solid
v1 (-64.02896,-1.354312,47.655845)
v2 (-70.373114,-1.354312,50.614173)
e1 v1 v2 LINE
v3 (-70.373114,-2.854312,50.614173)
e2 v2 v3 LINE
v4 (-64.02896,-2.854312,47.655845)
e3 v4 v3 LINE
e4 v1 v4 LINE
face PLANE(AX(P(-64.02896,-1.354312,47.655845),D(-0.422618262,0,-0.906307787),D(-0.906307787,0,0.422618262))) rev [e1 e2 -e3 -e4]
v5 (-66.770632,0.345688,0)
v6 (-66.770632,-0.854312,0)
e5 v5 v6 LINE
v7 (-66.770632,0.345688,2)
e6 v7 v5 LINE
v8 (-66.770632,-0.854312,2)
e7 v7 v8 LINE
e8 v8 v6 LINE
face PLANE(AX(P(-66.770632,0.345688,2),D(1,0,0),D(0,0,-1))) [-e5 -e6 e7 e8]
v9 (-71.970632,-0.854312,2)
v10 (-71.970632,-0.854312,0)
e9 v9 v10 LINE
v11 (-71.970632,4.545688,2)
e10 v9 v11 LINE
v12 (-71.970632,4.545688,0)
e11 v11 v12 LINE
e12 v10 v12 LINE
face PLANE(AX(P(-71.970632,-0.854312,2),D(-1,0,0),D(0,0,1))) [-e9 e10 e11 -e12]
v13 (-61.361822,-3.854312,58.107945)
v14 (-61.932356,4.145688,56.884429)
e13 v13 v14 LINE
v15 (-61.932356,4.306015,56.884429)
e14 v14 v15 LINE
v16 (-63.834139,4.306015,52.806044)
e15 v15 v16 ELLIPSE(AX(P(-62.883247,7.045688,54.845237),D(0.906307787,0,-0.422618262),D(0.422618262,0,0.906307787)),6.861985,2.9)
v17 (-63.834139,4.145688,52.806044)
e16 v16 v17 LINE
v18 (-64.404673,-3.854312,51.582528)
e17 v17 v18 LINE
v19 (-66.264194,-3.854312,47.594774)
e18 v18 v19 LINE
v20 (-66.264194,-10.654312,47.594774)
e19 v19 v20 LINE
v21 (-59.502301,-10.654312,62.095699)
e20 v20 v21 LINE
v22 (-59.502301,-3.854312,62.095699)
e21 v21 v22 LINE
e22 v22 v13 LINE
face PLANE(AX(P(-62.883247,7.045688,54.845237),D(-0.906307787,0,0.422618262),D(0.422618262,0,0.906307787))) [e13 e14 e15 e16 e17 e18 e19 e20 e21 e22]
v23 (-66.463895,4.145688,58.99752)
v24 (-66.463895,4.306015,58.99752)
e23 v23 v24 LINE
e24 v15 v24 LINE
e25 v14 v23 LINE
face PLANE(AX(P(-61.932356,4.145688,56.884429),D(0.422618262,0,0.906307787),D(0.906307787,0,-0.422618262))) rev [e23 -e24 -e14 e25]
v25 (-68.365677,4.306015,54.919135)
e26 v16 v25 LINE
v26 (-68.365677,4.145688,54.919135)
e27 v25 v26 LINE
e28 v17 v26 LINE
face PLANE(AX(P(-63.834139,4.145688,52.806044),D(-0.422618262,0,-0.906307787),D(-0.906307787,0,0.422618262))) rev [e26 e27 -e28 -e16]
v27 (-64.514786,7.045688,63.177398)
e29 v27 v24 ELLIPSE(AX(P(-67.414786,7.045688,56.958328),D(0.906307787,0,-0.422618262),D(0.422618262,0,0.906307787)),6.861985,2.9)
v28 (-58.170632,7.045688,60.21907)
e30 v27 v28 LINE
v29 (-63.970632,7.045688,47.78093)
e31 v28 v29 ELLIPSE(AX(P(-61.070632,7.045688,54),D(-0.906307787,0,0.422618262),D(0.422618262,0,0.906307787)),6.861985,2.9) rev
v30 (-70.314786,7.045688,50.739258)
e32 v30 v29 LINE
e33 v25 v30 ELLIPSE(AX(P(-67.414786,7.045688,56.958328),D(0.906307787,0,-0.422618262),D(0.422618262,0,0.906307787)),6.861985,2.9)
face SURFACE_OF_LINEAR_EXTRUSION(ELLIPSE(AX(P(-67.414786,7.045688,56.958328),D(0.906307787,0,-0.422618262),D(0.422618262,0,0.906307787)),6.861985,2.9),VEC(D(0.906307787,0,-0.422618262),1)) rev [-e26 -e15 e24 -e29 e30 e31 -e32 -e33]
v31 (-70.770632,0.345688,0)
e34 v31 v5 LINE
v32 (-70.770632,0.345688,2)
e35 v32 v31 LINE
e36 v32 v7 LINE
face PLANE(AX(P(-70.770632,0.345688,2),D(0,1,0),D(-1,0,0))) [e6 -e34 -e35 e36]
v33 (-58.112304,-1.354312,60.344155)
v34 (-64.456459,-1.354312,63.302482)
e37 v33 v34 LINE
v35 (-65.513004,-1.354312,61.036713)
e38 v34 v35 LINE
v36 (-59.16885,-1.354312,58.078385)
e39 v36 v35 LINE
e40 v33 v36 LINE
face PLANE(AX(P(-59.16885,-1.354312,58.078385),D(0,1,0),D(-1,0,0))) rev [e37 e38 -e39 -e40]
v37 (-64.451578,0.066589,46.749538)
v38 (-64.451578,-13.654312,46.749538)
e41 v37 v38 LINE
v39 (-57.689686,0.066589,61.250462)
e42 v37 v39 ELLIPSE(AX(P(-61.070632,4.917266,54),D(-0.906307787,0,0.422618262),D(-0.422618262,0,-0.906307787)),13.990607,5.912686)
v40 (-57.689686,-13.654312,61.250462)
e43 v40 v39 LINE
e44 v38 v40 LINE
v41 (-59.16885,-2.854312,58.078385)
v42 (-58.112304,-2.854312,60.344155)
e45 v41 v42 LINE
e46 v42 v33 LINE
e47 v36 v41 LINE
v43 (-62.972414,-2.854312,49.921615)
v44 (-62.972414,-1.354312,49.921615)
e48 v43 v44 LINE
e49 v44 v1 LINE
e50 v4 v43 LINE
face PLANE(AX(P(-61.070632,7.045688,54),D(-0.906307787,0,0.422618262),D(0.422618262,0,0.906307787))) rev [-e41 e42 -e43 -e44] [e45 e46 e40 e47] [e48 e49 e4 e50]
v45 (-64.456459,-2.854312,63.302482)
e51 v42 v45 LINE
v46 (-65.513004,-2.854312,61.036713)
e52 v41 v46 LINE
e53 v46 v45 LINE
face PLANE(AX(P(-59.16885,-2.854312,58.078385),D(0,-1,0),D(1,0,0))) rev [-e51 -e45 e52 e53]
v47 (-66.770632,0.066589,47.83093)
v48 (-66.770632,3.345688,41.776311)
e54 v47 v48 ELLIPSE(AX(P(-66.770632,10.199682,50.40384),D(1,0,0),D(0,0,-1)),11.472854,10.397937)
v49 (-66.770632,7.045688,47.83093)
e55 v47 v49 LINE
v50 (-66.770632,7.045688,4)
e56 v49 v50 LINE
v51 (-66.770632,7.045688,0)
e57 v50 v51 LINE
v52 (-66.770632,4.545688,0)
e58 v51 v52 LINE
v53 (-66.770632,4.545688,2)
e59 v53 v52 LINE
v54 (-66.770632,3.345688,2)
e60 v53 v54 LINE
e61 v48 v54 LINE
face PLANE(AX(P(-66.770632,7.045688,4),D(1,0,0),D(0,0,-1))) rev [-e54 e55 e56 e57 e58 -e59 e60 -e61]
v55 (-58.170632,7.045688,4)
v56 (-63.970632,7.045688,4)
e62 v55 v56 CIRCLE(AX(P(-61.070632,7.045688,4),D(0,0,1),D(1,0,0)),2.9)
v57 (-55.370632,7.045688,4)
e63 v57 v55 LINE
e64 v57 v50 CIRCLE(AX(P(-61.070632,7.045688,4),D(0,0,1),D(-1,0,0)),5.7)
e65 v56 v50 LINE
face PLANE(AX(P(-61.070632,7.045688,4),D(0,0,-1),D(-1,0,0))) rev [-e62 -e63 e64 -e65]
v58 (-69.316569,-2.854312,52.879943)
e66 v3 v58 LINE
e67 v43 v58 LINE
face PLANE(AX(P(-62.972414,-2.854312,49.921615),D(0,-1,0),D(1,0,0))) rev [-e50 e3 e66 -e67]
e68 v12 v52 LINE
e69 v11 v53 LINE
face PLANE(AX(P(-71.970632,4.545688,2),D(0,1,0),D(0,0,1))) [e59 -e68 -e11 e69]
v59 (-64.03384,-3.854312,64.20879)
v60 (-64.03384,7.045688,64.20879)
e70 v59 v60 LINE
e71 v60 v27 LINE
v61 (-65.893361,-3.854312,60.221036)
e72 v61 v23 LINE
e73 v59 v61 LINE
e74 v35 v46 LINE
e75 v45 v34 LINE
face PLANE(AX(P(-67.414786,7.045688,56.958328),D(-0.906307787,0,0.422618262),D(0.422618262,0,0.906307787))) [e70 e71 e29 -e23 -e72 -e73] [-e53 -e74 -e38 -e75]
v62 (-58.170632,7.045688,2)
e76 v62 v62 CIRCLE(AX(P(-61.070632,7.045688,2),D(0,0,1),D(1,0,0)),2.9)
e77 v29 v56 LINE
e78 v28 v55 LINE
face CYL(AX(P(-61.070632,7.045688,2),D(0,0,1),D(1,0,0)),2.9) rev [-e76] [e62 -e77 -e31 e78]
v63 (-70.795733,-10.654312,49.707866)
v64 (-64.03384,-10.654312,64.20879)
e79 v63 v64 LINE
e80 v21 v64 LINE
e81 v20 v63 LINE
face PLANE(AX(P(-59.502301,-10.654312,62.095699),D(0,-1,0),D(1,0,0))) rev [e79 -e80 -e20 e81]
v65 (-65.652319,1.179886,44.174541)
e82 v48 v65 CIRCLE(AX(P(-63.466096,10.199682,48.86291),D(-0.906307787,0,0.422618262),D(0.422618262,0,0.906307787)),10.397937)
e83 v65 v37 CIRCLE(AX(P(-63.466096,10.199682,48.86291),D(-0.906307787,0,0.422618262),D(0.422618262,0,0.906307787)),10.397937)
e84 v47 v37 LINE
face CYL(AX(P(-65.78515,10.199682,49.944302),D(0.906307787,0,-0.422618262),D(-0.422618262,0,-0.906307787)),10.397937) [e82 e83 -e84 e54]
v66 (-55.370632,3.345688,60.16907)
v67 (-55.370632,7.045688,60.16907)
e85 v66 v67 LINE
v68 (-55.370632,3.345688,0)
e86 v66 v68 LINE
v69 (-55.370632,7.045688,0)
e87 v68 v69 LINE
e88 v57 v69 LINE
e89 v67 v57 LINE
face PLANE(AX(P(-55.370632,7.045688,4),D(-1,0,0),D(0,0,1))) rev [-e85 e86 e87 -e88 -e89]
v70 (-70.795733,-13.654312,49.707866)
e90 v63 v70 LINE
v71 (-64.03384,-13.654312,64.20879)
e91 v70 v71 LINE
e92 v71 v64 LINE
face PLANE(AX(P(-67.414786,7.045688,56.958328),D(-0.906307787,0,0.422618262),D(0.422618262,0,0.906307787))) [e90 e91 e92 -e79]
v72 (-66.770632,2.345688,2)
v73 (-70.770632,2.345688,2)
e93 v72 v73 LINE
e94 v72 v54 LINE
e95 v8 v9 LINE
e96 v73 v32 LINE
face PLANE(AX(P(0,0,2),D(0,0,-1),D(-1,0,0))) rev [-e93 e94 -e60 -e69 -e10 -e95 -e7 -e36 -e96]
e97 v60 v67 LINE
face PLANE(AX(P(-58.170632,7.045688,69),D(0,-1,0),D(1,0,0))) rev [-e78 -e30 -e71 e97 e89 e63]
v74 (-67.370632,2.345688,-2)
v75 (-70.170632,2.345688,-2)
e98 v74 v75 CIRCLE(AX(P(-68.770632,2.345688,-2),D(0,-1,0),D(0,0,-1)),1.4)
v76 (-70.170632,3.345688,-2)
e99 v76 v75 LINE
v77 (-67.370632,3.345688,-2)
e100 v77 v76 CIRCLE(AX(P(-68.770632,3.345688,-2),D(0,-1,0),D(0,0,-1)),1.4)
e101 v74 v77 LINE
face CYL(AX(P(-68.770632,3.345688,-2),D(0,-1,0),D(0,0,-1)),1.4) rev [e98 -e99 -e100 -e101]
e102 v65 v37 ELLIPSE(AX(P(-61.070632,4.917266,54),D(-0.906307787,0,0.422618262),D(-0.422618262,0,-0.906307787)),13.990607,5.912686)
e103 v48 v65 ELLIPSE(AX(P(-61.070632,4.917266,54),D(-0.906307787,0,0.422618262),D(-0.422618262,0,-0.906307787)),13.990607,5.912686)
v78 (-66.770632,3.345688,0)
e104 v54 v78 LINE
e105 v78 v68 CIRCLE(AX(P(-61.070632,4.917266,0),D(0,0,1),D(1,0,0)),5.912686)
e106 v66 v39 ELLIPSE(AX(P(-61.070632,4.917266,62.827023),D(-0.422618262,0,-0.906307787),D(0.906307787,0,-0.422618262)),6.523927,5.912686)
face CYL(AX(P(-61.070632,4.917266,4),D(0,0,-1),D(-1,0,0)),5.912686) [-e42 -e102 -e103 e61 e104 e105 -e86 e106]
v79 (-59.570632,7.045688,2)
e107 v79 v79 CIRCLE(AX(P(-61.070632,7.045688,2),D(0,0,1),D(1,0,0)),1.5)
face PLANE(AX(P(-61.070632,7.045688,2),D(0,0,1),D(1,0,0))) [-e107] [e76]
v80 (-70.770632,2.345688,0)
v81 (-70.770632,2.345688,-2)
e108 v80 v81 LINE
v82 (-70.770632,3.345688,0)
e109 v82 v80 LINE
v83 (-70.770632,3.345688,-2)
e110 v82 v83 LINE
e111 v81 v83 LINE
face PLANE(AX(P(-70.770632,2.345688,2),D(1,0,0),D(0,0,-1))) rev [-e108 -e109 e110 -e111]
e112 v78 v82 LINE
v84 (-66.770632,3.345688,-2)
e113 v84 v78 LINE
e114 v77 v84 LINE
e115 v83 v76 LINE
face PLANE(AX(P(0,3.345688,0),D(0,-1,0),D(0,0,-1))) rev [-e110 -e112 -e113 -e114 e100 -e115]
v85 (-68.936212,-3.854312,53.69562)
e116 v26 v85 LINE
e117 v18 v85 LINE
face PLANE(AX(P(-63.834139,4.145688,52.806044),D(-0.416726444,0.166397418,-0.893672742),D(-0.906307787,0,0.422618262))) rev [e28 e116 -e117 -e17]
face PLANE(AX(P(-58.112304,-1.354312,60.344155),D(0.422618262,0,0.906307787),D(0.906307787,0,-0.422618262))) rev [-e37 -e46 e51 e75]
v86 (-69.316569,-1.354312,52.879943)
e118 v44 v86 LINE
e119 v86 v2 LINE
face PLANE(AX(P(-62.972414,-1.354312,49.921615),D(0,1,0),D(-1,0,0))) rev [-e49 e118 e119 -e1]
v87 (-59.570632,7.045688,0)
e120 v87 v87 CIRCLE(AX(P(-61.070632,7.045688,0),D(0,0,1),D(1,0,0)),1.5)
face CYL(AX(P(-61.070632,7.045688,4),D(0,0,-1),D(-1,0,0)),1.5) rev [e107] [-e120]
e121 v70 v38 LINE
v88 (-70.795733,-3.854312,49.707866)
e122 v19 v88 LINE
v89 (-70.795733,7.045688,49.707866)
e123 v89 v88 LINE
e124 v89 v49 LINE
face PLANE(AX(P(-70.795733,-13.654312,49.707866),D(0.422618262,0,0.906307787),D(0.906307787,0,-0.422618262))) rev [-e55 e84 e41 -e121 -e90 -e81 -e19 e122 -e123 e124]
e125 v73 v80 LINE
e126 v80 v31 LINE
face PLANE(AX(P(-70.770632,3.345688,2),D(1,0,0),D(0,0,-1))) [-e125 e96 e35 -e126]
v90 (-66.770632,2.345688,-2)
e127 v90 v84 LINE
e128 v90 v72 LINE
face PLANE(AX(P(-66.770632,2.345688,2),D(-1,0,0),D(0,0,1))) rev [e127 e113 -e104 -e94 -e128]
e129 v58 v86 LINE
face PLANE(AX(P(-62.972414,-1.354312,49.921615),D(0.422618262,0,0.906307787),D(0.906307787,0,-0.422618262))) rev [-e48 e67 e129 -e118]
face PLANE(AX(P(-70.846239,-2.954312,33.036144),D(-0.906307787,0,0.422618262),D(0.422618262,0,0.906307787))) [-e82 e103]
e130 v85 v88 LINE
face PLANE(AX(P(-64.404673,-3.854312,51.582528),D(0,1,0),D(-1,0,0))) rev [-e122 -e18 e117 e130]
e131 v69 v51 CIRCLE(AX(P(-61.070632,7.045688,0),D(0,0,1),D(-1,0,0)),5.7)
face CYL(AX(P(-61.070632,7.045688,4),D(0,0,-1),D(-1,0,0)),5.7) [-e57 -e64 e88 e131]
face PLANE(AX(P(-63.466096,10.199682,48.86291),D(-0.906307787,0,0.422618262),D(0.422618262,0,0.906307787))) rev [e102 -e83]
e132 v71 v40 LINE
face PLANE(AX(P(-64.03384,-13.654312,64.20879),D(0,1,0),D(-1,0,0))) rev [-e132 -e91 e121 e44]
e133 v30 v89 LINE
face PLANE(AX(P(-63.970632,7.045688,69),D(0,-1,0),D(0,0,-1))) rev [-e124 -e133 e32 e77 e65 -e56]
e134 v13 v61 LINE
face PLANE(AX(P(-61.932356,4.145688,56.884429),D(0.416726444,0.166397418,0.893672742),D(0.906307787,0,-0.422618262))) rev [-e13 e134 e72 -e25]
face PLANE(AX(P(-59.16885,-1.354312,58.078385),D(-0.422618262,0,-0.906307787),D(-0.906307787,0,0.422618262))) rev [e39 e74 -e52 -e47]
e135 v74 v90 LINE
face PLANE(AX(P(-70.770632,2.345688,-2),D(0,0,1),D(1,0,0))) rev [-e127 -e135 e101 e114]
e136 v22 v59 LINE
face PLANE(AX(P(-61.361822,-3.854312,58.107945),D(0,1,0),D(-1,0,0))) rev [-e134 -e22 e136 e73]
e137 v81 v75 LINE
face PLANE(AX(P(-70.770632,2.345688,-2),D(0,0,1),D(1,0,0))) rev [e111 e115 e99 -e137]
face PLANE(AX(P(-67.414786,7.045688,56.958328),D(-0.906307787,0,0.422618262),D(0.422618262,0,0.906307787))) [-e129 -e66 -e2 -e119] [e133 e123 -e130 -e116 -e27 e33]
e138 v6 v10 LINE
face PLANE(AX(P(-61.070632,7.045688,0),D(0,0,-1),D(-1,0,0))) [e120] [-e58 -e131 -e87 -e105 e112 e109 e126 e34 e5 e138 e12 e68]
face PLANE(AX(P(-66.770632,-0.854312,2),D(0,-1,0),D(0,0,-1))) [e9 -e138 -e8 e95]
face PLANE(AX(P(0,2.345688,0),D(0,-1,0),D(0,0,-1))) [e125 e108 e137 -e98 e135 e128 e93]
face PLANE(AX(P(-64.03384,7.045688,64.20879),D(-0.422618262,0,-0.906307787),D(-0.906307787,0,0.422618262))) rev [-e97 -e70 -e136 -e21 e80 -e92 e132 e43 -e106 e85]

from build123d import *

# Parameters (mm, degrees)
CROQUIS1_R                = 1.5
SALIENTE_EXTRUIR1_DEPTH   = 4
CROQUIS2_R                = 2.9
CORTAR_EXTRUIR1_DEPTH     = 2
SALIENTE_EXTRUIR2_DEPTH   = 65
CORTAR_EXTRUIR2_OUTLINE_W = 7.281077338
CORTAR_EXTRUIR2_OUTLINE_H = 8.780929931
CORTAR_EXTRUIR2_DEPTH     = 8.6
CORTAR_EXTRUIR2_TAPER     = -65
CROQUIS5_W                = 41.142355125
CROQUIS5_H                = 35.377069929
CORTAR_EXTRUIR3_DEPTH     = 10
SALIENTE_EXTRUIR3_DEPTH   = 7
CORTAR_EXTRUIR4_DEPTH     = 5
CORTAR_EXTRUIR5_START     = -7
CROQUIS8_W                = 2.5
CROQUIS8_H                = 1.5
CORTAR_EXTRUIR5_DEPTH     = 7
CORTAR_EXTRUIR6_DEPTH     = 10
SALIENTE_EXTRUIR4_DEPTH   = 3.7
SALIENTE_EXTRUIR5_DEPTH   = 2.558793
CORTAR_EXTRUIR7_DEPTH     = 10
SALIENTE_EXTRUIR6_DEPTH   = 2
CROQUIS15_W               = 4
CROQUIS15_H               = 4
SALIENTE_EXTRUIR7_DEPTH   = 1
CROQUIS16_R               = 1.4
CORTAR_EXTRUIR8_DEPTH     = 1


# Read off the part's stored shape, not the designer's step: Cortar-Extruir2
with BuildPart() as part:
    # Croquis1 → Saliente-Extruir1 (new body)
    with BuildSketch(Plane.XY):
        with BuildLine():
            Line((-55.370631899, 7.045687646), (-55.370631899, 3.345687646))
            ThreePointArc((-55.370631899, 3.345687646), (-61.070631899, -0.995420457), (-66.770631899, 3.345687646))
            Line((-66.770631899, 3.345687646), (-66.770631899, 7.045687646))
            ThreePointArc((-66.770631899, 7.045687646), (-61.070631899, 12.745687646), (-55.370631899, 7.045687646))
        make_face()
        with Locations((-61.070631899, 7.045687646)):
            Circle(CROQUIS1_R, mode=Mode.SUBTRACT)
    extrude(amount=SALIENTE_EXTRUIR1_DEPTH)

    # Croquis2 → Cortar-Extruir1 (cut)
    with BuildSketch(Plane.XY.offset(4)):
        with Locations((-61.070631899, 7.045687646)):
            Circle(CROQUIS2_R)
    extrude(amount=-CORTAR_EXTRUIR1_DEPTH, mode=Mode.SUBTRACT)

    # Croquis3 → Saliente-Extruir2 (add)
    with BuildSketch(Plane.XY.offset(4)):
        with BuildLine():
            Line((-63.970631899, 7.045687646), (-66.770631899, 7.045687646))
            Line((-66.770631899, 7.045687646), (-66.770631899, 3.345687646))
            ThreePointArc((-66.770631899, 3.345687646), (-61.070631899, -0.995420457), (-55.370631899, 3.345687646))
            Line((-55.370631899, 3.345687646), (-55.370631899, 7.045687646))
            Line((-55.370631899, 7.045687646), (-58.170631899, 7.045687646))
            ThreePointArc((-58.170631899, 7.045687646), (-61.070631899, 4.145687646), (-63.970631899, 7.045687646))
        make_face()
    extrude(amount=SALIENTE_EXTRUIR2_DEPTH)

    # Cortar-Extruir2 outline → Cortar-Extruir2 (cut)
    with BuildSketch(Plane.YZ.offset(-58.170631899)):
        with Locations((3.405148977, 64.609535034)):
            Rectangle(CORTAR_EXTRUIR2_OUTLINE_W, CORTAR_EXTRUIR2_OUTLINE_H)
    extrude(amount=-CORTAR_EXTRUIR2_DEPTH, taper=CORTAR_EXTRUIR2_TAPER, mode=Mode.SUBTRACT)

    # Croquis5 → Cortar-Extruir3 (cut)
    with BuildSketch(Plane(origin=(-70.846238664, 0, 33.03614364), x_dir=(0.422618261740701, 0, 0.9063077870366493), z_dir=(-0.9063077870366493, 1.4037441023509523e-15, 0.422618261740701))):
        with Locations((23.845262034, -3.548141358)):
            Rectangle(CROQUIS5_W, CROQUIS5_H)
    extrude(amount=CORTAR_EXTRUIR3_DEPTH, mode=Mode.SUBTRACT)

    # Croquis6 → Saliente-Extruir3 (add)
    with BuildSketch(Plane(origin=(-70.846238664, 0, 33.03614364), x_dir=(0.422618261740701, 0, 0.9063077870366493), z_dir=(-0.9063077870366493, 1.4037441023509523e-15, 0.422618261740701))):
        with BuildLine():
            Line((31.131056203, 7.045687646), (29.993040795, 7.045687646))
            add(Edge.make_bspline(
                [(16.269071612, 7.045687646), (16.269071612, 4.145687646), (23.131056203, 4.145687646), (29.993040795, 4.145687646), (29.993040795, 7.045687646)],
                knots=[3.141592654, 3.141592654, 3.141592654, 4.71238898, 4.71238898, 6.283185307, 6.283185307, 6.283185307], degree=2, weights=[1, 0.707106781, 1, 0.707106781, 1]))
            Line((16.269071612, 7.045687646), (15.131056203, 7.045687646))
            Line((15.131056203, 7.045687646), (15.131056203, -13.654312354))
            Line((15.131056203, -13.654312354), (31.131056203, -13.654312354))
            Line((31.131056203, -13.654312354), (31.131056203, 7.045687646))
        make_face()
    extrude(amount=SALIENTE_EXTRUIR3_DEPTH)

    # Croquis7 → Cortar-Extruir4 (cut)
    with BuildSketch(Plane(origin=(-77.190393173, 0, 35.994471473), x_dir=(0.42261826174070094, 0, 0.9063077870366492), z_dir=(-0.9063077870366493, 1.403744102350952e-15, 0.422618261740701))):
        with BuildLine():
            Line((25.381056203, 4.145687646), (26.731056203, -3.854312354))
            Line((26.731056203, -3.854312354), (31.131056203, -3.854312354))
            Line((31.131056203, -3.854312354), (31.131056203, -10.654312354))
            Line((31.131056203, -10.654312354), (15.131056203, -10.654312354))
            Line((15.131056203, -10.654312354), (15.131056203, -3.854312354))
            Line((15.131056203, -3.854312354), (19.531056203, -3.854312354))
            Line((19.531056203, -3.854312354), (20.881056203, 4.145687646))
            Line((20.881056203, 4.145687646), (20.881056203, 4.306015013))
            add(Edge.make_bspline(
                [(20.881056203, 4.306015013), (23.131056203, 3.97597782), (25.381056203, 4.306015013)],
                knots=[4.378316067, 4.378316067, 4.378316067, 5.046461894, 5.046461894, 5.046461894], degree=2, weights=[1, 0.944714701, 1]))
            Line((25.381056203, 4.306015013), (25.381056203, 4.145687646))
        make_face()
    extrude(amount=-CORTAR_EXTRUIR4_DEPTH, mode=Mode.SUBTRACT)

    # Croquis8 → Cortar-Extruir5 (cut)
    with BuildSketch(Plane(origin=(-77.190393173, 0, 35.994471473), x_dir=(0.42261826174070094, 0, 0.9063077870366492), z_dir=(-0.9063077870366493, 1.403744102350952e-15, 0.422618261740701)).offset(CORTAR_EXTRUIR5_START)):
        with Locations((17.381056203, -2.104312354)):
            Rectangle(CROQUIS8_W, CROQUIS8_H)
        with Locations((28.881056203, -2.104312354)):
            Rectangle(CROQUIS8_W, CROQUIS8_H)
    extrude(amount=CORTAR_EXTRUIR5_DEPTH, mode=Mode.SUBTRACT)

    # Croquis9 → Cortar-Extruir6 (cut)
    with BuildSketch(Plane(origin=(0, 7.045687646, 0), x_dir=(1, 0, 0), z_dir=(0, 1, 0))):
        Polygon((-57.689685805, -61.250462296), (-55.370631899, -60.1690697), (-55.370631899, -66.223689447), align=None)
    extrude(amount=-CORTAR_EXTRUIR6_DEPTH, mode=Mode.SUBTRACT)

    # Croquis10 → Saliente-Extruir4 (add)
    with BuildSketch(Plane(origin=(0, 7.045687646, 0), x_dir=(1, 0, 0), z_dir=(0, 1, 0))):
        Polygon((-66.770631899, -41.776310553), (-66.770631899, -47.8309303), (-64.451577993, -46.749537704), align=None)
    extrude(amount=-SALIENTE_EXTRUIR4_DEPTH)

    # Croquis12 → Saliente-Extruir5 (add)
    with BuildSketch(Plane(origin=(-70.846238664, 0, 33.03614364), x_dir=(0.422618261740701, 0, 0.9063077870366493), z_dir=(-0.9063077870366493, 1.4037441023509523e-15, 0.422618261740701))):
        with BuildLine():
            Line((15.131056203, 3.345687646), (15.131056203, 0.066589345))
            ThreePointArc((15.131056203, 0.066589345), (12.129139109, 1.273987016), (9.64370718, 3.345687646))
            Line((9.64370718, 3.345687646), (15.131056203, 3.345687646))
        make_face()
    extrude(amount=SALIENTE_EXTRUIR5_DEPTH)

    # Croquis13 → Cortar-Extruir7 (cut)
    with BuildSketch(Plane(origin=(0, 3.345687646, 0), x_dir=(1, 0, 0), z_dir=(0, 1, 0))):
        Polygon((-66.770631899, -47.8309303), (-66.770631899, -41.776310553), (-69.089685805, -42.857703149), align=None)
    extrude(amount=-CORTAR_EXTRUIR7_DEPTH, mode=Mode.SUBTRACT)

    # Croquis14 → Saliente-Extruir6 (add)
    with BuildSketch(Plane(origin=(0, 0, 0), x_dir=(-1, 0, 0), z_dir=(0, 0, -1))):
        Polygon((66.770631899, 3.345687646), (70.770631899, 3.345687646), (70.770631899, 0.345687646), (66.770631899, 0.345687646), (66.770631899, -0.854312354), (71.970631899, -0.854312354), (71.970631899, 4.545687646), (66.770631899, 4.545687646), align=None)
    extrude(amount=-SALIENTE_EXTRUIR6_DEPTH)

    # Croquis15 → Saliente-Extruir7 (add)
    with BuildSketch(Plane.XZ.offset(-3.345687646)):
        with Locations((-68.770631899, 0)):
            Rectangle(CROQUIS15_W, CROQUIS15_H)
    extrude(amount=SALIENTE_EXTRUIR7_DEPTH)

    # Croquis16 → Cortar-Extruir8 (cut)
    with BuildSketch(Plane.XZ.offset(-2.345687646)):
        with Locations((-68.770631899, -2)):
            Circle(CROQUIS16_R)
    extrude(amount=-CORTAR_EXTRUIR8_DEPTH, mode=Mode.SUBTRACT)


solid = part.part
